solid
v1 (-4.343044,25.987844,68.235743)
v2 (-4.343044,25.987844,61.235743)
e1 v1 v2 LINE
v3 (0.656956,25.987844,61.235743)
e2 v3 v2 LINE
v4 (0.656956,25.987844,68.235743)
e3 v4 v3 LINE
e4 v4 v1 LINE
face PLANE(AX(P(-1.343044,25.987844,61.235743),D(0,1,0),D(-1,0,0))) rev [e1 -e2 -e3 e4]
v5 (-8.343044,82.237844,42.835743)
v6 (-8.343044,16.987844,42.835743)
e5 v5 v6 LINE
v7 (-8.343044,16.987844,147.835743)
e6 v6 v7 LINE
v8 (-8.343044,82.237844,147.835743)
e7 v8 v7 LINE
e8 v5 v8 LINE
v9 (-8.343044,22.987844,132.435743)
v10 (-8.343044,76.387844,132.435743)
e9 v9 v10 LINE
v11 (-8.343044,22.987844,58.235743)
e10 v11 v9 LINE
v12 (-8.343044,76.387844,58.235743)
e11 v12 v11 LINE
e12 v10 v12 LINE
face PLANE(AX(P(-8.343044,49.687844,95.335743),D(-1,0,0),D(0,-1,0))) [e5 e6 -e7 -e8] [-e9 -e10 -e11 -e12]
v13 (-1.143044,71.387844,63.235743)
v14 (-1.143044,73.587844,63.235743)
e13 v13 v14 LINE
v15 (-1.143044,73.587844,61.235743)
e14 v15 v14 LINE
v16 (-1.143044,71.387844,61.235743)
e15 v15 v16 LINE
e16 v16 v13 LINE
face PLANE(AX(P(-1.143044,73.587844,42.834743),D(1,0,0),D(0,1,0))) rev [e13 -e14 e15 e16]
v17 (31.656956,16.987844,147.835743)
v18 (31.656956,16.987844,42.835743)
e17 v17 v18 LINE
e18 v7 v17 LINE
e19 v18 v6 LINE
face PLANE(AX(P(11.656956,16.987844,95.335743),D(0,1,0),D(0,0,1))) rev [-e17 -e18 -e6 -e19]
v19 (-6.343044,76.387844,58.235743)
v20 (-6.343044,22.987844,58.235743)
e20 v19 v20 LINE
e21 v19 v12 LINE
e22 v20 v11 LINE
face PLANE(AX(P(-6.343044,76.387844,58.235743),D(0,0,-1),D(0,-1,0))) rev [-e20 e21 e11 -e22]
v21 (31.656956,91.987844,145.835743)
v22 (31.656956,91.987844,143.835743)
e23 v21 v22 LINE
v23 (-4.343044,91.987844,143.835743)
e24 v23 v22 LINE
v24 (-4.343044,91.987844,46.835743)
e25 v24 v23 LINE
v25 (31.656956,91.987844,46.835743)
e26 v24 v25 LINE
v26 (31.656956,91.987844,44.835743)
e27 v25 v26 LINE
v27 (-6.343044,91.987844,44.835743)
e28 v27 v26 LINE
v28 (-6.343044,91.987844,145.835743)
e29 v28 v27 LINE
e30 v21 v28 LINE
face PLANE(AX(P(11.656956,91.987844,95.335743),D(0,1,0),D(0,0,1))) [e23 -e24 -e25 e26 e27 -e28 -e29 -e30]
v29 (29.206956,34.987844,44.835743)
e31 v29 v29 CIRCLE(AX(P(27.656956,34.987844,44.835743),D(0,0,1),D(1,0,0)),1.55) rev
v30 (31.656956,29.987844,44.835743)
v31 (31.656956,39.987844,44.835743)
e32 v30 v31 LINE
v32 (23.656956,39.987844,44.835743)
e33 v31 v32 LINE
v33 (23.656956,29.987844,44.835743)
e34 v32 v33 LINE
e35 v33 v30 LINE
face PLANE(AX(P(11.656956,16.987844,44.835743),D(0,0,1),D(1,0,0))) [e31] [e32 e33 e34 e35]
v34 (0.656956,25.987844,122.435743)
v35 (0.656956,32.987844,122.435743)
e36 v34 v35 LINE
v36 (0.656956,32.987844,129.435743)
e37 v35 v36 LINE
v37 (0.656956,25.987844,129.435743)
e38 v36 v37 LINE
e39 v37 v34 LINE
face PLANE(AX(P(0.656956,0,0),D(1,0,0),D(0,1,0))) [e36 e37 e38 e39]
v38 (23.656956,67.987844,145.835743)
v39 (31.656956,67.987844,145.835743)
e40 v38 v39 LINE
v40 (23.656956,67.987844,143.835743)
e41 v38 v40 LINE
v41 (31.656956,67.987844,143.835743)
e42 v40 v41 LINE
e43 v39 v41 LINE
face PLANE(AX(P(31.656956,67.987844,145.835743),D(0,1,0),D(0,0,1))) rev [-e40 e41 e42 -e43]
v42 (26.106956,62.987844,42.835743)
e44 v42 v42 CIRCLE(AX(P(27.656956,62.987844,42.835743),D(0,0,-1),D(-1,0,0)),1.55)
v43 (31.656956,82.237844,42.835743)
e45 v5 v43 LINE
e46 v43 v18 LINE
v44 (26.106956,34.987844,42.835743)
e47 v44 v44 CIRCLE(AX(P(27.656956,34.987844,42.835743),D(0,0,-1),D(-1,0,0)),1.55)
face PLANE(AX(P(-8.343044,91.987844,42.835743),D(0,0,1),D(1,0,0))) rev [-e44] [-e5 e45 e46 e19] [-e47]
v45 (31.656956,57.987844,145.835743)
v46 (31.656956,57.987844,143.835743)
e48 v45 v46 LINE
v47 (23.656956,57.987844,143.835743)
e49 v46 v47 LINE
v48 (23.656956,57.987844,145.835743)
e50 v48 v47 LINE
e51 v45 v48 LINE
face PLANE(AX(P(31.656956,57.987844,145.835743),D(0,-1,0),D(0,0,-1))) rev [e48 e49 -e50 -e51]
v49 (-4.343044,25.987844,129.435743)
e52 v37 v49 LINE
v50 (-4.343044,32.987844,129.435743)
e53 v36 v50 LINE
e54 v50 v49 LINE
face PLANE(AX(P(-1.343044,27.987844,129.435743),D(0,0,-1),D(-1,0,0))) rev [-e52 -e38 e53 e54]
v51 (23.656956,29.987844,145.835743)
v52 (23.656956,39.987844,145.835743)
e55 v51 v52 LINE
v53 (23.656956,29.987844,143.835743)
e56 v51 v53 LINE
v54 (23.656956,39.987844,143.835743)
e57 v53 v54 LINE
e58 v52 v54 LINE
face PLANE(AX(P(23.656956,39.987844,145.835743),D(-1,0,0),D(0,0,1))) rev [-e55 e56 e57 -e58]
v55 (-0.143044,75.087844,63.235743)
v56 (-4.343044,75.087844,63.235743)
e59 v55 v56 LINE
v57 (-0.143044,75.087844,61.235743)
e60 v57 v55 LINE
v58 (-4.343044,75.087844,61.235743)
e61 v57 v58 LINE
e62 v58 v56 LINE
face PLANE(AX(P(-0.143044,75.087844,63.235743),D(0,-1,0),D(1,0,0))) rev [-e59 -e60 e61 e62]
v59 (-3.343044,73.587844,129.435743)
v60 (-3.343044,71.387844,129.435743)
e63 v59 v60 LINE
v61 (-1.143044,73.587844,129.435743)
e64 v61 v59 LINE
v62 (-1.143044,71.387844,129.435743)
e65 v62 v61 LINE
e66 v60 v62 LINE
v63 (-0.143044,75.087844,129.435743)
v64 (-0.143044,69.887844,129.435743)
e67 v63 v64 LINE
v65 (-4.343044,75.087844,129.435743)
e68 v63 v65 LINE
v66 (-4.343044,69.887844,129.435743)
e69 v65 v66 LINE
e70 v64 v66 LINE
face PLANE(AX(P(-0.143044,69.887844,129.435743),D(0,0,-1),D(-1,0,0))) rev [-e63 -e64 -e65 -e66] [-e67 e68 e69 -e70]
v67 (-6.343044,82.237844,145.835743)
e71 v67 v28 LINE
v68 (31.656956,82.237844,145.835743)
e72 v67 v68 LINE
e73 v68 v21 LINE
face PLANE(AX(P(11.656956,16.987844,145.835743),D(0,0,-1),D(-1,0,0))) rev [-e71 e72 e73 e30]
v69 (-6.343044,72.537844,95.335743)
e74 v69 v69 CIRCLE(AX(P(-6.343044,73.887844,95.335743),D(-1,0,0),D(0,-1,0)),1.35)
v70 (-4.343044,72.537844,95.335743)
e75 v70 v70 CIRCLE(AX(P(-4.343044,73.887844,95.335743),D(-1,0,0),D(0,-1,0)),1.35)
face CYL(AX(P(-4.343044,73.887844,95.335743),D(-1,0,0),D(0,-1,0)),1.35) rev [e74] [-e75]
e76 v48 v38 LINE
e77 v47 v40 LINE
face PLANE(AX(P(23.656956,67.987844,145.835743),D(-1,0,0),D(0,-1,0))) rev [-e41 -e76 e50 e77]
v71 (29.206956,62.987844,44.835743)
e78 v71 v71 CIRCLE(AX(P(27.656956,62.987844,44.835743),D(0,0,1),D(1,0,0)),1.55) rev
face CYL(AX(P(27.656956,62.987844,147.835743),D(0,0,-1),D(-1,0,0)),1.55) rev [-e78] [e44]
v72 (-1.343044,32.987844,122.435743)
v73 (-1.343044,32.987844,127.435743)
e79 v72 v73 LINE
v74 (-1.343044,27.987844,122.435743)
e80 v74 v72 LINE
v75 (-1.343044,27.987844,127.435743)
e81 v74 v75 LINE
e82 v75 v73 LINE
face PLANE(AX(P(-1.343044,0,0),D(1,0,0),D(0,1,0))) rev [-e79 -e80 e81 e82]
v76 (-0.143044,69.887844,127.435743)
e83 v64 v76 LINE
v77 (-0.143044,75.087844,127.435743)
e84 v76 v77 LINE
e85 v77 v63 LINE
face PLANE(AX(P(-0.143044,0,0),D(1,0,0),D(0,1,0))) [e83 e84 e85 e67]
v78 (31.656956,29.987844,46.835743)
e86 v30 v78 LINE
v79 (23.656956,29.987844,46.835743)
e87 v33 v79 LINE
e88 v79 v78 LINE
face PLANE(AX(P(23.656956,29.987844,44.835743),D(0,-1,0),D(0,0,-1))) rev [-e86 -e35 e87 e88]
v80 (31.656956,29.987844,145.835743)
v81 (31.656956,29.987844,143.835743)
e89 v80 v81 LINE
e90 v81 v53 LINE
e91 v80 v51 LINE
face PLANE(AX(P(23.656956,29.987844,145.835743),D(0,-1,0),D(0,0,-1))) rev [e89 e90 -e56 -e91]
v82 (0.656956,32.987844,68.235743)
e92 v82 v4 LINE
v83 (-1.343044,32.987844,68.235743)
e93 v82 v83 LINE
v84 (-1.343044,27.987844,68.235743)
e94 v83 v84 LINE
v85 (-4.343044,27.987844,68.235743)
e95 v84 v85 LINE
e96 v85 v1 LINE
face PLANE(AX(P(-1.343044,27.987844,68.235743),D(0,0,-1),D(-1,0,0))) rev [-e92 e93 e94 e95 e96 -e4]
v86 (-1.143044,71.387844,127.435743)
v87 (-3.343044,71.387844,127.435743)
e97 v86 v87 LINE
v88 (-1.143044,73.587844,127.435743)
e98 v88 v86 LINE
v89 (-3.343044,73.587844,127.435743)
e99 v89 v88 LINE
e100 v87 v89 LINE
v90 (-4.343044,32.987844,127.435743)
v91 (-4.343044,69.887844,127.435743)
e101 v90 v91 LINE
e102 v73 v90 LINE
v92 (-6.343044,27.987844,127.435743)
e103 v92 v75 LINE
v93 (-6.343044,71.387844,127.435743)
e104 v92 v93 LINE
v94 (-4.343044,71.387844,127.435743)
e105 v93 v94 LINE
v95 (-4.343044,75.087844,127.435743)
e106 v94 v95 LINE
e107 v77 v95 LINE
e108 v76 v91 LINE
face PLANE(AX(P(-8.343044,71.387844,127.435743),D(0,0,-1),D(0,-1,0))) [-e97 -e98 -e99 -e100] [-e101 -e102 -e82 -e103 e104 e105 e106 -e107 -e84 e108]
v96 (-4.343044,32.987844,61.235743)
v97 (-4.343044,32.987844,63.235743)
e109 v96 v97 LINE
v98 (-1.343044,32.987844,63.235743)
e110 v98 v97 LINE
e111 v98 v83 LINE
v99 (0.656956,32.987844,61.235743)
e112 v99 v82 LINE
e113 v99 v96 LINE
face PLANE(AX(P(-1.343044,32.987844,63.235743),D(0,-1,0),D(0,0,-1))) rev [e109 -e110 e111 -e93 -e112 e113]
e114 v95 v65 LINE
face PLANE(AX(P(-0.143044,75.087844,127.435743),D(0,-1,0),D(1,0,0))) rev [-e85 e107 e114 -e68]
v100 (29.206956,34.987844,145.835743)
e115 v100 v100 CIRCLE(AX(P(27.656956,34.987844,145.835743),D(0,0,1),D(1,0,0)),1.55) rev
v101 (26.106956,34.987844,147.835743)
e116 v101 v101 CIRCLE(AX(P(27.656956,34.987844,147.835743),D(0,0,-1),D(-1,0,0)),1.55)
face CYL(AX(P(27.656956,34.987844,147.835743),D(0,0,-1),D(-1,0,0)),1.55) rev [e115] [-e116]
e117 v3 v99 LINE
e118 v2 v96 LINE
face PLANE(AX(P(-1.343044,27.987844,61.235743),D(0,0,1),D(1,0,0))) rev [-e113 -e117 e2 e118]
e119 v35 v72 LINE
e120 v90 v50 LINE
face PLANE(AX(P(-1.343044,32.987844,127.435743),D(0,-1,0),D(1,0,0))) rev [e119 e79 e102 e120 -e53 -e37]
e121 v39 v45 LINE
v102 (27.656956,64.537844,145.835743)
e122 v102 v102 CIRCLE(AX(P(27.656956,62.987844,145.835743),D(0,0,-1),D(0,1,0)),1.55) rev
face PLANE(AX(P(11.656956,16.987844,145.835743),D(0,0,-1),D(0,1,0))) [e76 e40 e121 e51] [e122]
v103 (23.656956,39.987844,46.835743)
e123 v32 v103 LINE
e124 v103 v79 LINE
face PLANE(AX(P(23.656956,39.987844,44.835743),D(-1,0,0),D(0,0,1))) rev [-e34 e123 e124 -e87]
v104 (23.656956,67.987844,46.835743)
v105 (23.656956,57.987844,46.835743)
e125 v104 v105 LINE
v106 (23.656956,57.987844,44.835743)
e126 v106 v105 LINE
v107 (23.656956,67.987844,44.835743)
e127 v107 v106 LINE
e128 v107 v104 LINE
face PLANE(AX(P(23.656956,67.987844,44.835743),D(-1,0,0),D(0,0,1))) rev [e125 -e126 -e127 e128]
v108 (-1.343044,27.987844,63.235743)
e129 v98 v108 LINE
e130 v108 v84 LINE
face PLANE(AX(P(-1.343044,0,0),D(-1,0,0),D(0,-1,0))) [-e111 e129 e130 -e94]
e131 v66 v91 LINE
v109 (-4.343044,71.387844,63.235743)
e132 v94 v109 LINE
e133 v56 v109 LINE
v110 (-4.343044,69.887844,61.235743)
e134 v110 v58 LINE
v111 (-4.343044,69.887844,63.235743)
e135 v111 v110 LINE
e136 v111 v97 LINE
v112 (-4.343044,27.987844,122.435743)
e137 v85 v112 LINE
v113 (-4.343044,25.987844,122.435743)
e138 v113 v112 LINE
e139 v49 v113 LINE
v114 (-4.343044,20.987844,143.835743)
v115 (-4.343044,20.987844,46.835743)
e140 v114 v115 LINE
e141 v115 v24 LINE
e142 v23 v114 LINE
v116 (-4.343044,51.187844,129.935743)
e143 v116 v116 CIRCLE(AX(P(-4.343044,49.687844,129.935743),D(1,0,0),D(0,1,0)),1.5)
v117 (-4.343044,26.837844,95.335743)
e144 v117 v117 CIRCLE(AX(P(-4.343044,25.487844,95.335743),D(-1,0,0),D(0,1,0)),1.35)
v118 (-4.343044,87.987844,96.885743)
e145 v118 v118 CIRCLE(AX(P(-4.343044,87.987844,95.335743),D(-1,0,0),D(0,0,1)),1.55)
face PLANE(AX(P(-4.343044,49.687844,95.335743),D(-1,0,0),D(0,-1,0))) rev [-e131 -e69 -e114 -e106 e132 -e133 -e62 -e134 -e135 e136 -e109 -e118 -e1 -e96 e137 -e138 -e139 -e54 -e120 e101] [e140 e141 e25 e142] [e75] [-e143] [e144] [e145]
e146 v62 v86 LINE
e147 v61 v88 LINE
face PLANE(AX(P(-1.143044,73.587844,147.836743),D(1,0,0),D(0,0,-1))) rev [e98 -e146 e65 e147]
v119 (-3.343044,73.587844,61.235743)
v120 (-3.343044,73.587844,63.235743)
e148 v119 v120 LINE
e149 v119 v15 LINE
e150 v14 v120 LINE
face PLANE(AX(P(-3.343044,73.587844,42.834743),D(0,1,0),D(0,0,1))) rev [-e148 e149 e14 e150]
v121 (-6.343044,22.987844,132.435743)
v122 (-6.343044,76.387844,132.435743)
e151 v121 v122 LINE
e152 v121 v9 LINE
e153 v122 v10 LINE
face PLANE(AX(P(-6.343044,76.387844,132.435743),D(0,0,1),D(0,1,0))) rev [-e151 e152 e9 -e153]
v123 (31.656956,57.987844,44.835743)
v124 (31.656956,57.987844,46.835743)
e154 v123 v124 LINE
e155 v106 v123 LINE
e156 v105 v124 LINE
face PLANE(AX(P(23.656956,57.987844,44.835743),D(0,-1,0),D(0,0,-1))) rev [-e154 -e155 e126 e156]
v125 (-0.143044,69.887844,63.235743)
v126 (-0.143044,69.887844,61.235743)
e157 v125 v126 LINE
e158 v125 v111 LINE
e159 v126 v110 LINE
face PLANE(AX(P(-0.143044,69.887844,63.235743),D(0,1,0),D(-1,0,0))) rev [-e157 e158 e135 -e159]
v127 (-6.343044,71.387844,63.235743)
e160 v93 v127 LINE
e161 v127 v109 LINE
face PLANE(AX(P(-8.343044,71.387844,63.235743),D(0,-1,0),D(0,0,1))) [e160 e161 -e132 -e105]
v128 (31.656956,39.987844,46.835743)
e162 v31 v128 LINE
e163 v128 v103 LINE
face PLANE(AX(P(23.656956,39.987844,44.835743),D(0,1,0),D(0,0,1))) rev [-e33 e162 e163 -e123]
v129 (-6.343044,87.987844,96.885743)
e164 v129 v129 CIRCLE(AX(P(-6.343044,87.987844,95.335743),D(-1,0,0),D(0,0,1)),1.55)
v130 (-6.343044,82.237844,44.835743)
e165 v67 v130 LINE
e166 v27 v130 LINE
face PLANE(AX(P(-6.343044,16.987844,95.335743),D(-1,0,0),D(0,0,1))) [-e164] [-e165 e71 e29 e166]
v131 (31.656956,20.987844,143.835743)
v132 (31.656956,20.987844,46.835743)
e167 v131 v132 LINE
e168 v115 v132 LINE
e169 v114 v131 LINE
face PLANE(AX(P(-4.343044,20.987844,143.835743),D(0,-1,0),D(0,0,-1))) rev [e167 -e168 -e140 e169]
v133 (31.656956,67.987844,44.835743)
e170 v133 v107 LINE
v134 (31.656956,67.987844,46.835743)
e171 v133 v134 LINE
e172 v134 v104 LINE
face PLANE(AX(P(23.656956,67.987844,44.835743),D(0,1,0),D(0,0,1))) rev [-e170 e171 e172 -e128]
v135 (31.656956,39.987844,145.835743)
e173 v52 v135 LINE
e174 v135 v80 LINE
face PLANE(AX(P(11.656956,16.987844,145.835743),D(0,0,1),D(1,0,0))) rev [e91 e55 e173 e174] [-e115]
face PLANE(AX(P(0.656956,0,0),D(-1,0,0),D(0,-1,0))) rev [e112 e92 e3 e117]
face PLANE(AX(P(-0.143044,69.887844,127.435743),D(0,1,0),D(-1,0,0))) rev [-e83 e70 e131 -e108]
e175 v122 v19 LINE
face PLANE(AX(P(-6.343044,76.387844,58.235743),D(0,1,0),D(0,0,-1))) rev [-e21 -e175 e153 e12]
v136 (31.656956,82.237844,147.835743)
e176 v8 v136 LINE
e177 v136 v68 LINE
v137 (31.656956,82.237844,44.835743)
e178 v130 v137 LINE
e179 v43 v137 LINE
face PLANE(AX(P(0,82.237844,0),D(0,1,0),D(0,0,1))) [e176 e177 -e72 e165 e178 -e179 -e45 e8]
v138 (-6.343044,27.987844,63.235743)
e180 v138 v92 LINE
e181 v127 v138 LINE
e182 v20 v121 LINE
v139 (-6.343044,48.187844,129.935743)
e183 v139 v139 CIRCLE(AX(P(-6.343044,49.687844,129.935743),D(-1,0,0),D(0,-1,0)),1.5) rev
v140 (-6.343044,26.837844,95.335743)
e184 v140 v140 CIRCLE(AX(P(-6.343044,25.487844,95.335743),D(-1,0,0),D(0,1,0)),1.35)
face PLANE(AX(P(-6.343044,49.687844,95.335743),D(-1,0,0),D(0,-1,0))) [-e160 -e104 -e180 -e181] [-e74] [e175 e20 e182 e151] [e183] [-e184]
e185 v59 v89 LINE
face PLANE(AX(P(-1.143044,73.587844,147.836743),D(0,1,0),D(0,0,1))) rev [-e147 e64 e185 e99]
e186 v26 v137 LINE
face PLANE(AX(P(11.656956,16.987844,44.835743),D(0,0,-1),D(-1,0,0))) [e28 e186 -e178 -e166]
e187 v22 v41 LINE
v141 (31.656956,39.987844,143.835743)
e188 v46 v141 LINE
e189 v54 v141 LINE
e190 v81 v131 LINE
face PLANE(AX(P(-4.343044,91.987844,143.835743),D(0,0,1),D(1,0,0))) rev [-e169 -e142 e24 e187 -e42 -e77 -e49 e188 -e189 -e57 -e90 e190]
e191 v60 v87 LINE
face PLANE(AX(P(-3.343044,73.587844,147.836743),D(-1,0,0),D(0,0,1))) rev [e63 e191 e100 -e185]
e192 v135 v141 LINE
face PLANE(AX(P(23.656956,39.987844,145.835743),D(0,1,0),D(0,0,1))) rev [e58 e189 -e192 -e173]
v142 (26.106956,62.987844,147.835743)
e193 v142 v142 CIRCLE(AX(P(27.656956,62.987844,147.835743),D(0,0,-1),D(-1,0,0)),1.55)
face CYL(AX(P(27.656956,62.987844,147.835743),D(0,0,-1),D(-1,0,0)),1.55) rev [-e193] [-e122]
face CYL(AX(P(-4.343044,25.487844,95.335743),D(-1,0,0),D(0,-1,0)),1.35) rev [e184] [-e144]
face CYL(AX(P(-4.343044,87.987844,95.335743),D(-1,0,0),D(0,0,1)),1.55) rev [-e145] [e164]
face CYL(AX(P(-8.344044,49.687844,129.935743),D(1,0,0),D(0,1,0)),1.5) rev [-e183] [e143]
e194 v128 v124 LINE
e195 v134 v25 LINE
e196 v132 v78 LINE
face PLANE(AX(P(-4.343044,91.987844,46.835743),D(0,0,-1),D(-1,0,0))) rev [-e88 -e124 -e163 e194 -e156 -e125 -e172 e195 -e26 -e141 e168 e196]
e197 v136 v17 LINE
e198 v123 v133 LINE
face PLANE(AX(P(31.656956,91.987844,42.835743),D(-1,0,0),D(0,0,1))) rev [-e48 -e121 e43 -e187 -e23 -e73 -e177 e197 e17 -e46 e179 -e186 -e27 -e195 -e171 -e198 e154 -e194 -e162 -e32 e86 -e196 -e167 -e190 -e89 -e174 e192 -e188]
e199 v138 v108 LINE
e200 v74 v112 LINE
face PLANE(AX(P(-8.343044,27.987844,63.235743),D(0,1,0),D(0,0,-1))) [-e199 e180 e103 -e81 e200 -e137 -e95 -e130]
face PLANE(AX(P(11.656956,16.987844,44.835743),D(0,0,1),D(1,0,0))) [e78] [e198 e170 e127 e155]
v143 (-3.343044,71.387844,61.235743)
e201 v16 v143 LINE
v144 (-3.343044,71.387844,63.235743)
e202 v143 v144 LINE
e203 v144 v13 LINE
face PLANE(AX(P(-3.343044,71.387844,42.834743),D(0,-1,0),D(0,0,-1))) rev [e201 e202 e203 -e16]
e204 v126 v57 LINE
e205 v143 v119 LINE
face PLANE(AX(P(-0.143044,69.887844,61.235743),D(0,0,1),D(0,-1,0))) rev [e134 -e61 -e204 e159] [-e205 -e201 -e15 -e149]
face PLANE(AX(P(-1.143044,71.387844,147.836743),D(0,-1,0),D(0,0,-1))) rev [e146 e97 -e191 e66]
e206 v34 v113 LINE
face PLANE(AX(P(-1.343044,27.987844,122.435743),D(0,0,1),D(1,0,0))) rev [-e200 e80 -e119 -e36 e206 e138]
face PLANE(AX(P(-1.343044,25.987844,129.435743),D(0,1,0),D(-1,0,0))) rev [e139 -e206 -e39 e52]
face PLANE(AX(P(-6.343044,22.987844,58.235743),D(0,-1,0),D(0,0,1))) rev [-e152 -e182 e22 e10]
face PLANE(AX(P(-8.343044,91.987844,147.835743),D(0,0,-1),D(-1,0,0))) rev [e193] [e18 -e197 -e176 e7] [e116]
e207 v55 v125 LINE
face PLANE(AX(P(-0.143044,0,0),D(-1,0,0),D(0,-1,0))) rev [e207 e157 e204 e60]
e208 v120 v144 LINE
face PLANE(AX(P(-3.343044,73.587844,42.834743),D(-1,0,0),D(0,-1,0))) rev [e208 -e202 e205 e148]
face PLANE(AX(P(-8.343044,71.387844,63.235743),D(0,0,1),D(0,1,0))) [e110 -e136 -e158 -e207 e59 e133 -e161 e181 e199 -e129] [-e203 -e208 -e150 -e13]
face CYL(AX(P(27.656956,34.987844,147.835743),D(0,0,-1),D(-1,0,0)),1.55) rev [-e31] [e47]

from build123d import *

# Parameters (mm, degrees)
COMBINE1_START         = -8.34304364
COMBINE1_DEPTH         = 32
COMBINE1_START_2       = -6.34304364
COMBINE1_2_OUTLINE_R   = 1.35
COMBINE1_2_OUTLINE_W   = 43.4
COMBINE1_2_OUTLINE_H   = 64.2
COMBINE1_2_OUTLINE_R_2 = 1.55
COMBINE1_2_DEPTH       = 2
COMBINE1_3_OUTLINE_W   = 61.2
COMBINE1_3_OUTLINE_H   = 97
COMBINE1_3_OUTLINE_W_2 = 53.4
COMBINE1_3_OUTLINE_H_2 = 74.2
COMBINE1_3_DEPTH       = 2
COMBINE1_START_3       = -4.34304364
COMBINE1_4_DEPTH       = 30.4499999
COMBINE1_START_4       = 29.20695646
COMBINE1_5_DEPTH       = 2.4499999
COMBINE1_START_5       = 23.65695636
COMBINE1_6_OUTLINE_W   = 9.8
COMBINE1_6_OUTLINE_H   = 2
COMBINE1_6_DEPTH       = 8
COMBINE1_START_6       = 42.835743365
COMBINE1_7_OUTLINE_W   = 3.1000002
COMBINE1_7_OUTLINE_H   = 4
COMBINE1_7_DEPTH       = 105
COMBINE1_8_OUTLINE_W   = 3.1000002
COMBINE1_8_OUTLINE_H   = 18
COMBINE1_8_OUTLINE_H_2 = 14.2
COMBINE1_8_OUTLINE_H_3 = 9
COMBINE1_8_DEPTH       = 4
COMBINE1_START_7       = 143.835743365
COMBINE1_9_OUTLINE_W   = 3.1000002
COMBINE1_9_OUTLINE_H   = 18
COMBINE1_9_OUTLINE_H_2 = 14.2
COMBINE1_9_OUTLINE_H_3 = 9
COMBINE1_9_DEPTH       = 4
COMBINE1_10_DEPTH      = 2
COMBINE1_START_8       = 145.835743365
COMBINE1_11_DEPTH      = 2
CUT_EXTRUDE1_REACH     = 179.801
SKETCH2_R              = 1.5
BOSS_EXTRUDE1_DEPTH    = 3
SKETCH4_W              = 7
SKETCH4_H              = 7
BOSS_EXTRUDE2_DEPTH    = 2
SKETCH5_W              = 2
SKETCH5_H              = 5.2
BOSS_EXTRUDE3_DEPTH    = 4.2
CUT_EXTRUDE2_REACH     = 130.923
SKETCH6_W              = 2.2
SKETCH6_H              = 2.2
CUT_EXTRUDE3_REACH     = 130.923
SKETCH7_W              = 2.2
SKETCH7_H              = 2.2
SKETCH8_W              = 2
SKETCH8_H              = 101
BOSS_EXTRUDE4_DEPTH    = 0.05


with BuildPart() as part:
    # Combine1: read off the stored shape, not the designer's step
    # Combine1 outline → Combine1 (new body)
    with BuildSketch(Plane.YZ.offset(COMBINE1_START)):
        Polygon((82.18784428, 42.835743365), (82.18784428, 46.835743365), (20.98784428, 46.835743365), (20.98784428, 143.835743365), (82.18784428, 143.835743365), (82.18784428, 147.835743365), (16.98784428, 147.835743365), (16.98784428, 42.835743365), align=None)
    extrude(amount=COMBINE1_DEPTH)

    # Combine1 2 outline → Combine1 2 (add)
    with BuildSketch(Plane.YZ.offset(COMBINE1_START_2)):
        Polygon((82.18784428, 46.835743365), (82.18784428, 44.835743365), (91.98784428, 44.835743365), (91.98784428, 145.835743365), (82.18784428, 145.835743365), (82.18784428, 143.835743365), (20.98784428, 143.835743365), (20.98784428, 46.835743365), align=None)
        with Locations((25.48784428, 95.335743365)):
            Circle(COMBINE1_2_OUTLINE_R, mode=Mode.SUBTRACT)
        with Locations((49.68784428, 95.335743365)):
            Rectangle(COMBINE1_2_OUTLINE_W, COMBINE1_2_OUTLINE_H, mode=Mode.SUBTRACT)
        with Locations((73.88784428, 95.335743365)):
            Circle(COMBINE1_2_OUTLINE_R, mode=Mode.SUBTRACT)
        with Locations((87.98784428, 95.335743365)):
            Circle(COMBINE1_2_OUTLINE_R_2, mode=Mode.SUBTRACT)
    extrude(amount=COMBINE1_2_DEPTH)

    # Combine1 3 outline → Combine1 3 (add)
    with BuildSketch(Plane.YZ.offset(COMBINE1_START)):
        with Locations((51.58784428, 95.335743365)):
            Rectangle(COMBINE1_3_OUTLINE_W, COMBINE1_3_OUTLINE_H)
        with Locations((49.68784428, 95.335743365)):
            Rectangle(COMBINE1_3_OUTLINE_W_2, COMBINE1_3_OUTLINE_H_2, mode=Mode.SUBTRACT)
    extrude(amount=COMBINE1_3_DEPTH)

    # Combine1 4 outline → Combine1 4 (add)
    with BuildSketch(Plane.YZ.offset(COMBINE1_START_3)):
        Polygon((82.18784428, 44.835743365), (91.98784428, 44.835743365), (91.98784428, 46.835743365), (67.98784428, 46.835743365), (67.98784428, 44.835743365), (57.98784428, 44.835743365), (57.98784428, 46.835743365), (39.98784428, 46.835743365), (39.98784428, 44.835743365), (29.98784428, 44.835743365), (29.98784428, 46.835743365), (20.98784428, 46.835743365), (20.98784428, 143.835743365), (29.98784428, 143.835743365), (29.98784428, 145.835743365), (39.98784428, 145.835743365), (39.98784428, 143.835743365), (57.98784428, 143.835743365), (57.98784428, 145.835743365), (67.98784428, 145.835743365), (67.98784428, 143.835743365), (91.98784428, 143.835743365), (91.98784428, 145.835743365), (82.18784428, 145.835743365), (82.18784428, 147.835743365), (16.98784428, 147.835743365), (16.98784428, 42.835743365), (82.18784428, 42.835743365), align=None)
    extrude(amount=COMBINE1_4_DEPTH)



with BuildPart() as body_2:
    # Combine1 5 outline → Combine1 5 (new body)
    with BuildSketch(Plane.YZ.offset(COMBINE1_START_4)):
        Polygon((82.18784428, 44.835743365), (91.98784428, 44.835743365), (91.98784428, 46.835743365), (67.98784428, 46.835743365), (67.98784428, 44.835743365), (57.98784428, 44.835743365), (57.98784428, 46.835743365), (39.98784428, 46.835743365), (39.98784428, 44.835743365), (29.98784428, 44.835743365), (29.98784428, 46.835743365), (20.98784428, 46.835743365), (20.98784428, 143.835743365), (29.98784428, 143.835743365), (29.98784428, 145.835743365), (39.98784428, 145.835743365), (39.98784428, 143.835743365), (57.98784428, 143.835743365), (57.98784428, 145.835743365), (67.98784428, 145.835743365), (67.98784428, 143.835743365), (91.98784428, 143.835743365), (91.98784428, 145.835743365), (82.18784428, 145.835743365), (82.18784428, 147.835743365), (16.98784428, 147.835743365), (16.98784428, 42.835743365), (82.18784428, 42.835743365), align=None)
    extrude(amount=COMBINE1_5_DEPTH)


with BuildPart() as part_1:
    add(part.part)

    add(body_2.part)  # Combine1 6 merges body 2
    # Combine1 6 outline → Combine1 6 (add)
    with BuildSketch(Plane.YZ.offset(COMBINE1_START_5)):
        with Locations((87.08784428, 45.835743365)):
            Rectangle(COMBINE1_6_OUTLINE_W, COMBINE1_6_OUTLINE_H)
        with Locations((87.08784428, 144.835743365)):
            Rectangle(COMBINE1_6_OUTLINE_W, COMBINE1_6_OUTLINE_H)
    extrude(amount=COMBINE1_6_DEPTH)

    # Combine1 7 outline → Combine1 7 (add)
    with BuildSketch(Plane.XY.offset(COMBINE1_START_6)):
        with Locations((27.65695636, 18.98784428)):
            Rectangle(COMBINE1_7_OUTLINE_W, COMBINE1_7_OUTLINE_H)
    extrude(amount=COMBINE1_7_DEPTH)

    # Combine1 8 outline → Combine1 8 (add)
    with BuildSketch(Plane.XY.offset(COMBINE1_START_6)):
        with Locations((27.65695636, 48.98784428)):
            Rectangle(COMBINE1_8_OUTLINE_W, COMBINE1_8_OUTLINE_H)
        with Locations((27.65695636, 75.08784428)):
            Rectangle(COMBINE1_8_OUTLINE_W, COMBINE1_8_OUTLINE_H_2)
        with Locations((27.65695636, 25.48784428)):
            Rectangle(COMBINE1_8_OUTLINE_W, COMBINE1_8_OUTLINE_H_3)
    extrude(amount=COMBINE1_8_DEPTH)

    # Combine1 9 outline → Combine1 9 (add)
    with BuildSketch(Plane.XY.offset(COMBINE1_START_7)):
        with Locations((27.65695636, 48.98784428)):
            Rectangle(COMBINE1_9_OUTLINE_W, COMBINE1_9_OUTLINE_H)
        with Locations((27.65695636, 75.08784428)):
            Rectangle(COMBINE1_9_OUTLINE_W, COMBINE1_9_OUTLINE_H_2)
        with Locations((27.65695636, 25.48784428)):
            Rectangle(COMBINE1_9_OUTLINE_W, COMBINE1_9_OUTLINE_H_3)
    extrude(amount=COMBINE1_9_DEPTH)

    # Combine1 10 outline → Combine1 10 (add)
    with BuildSketch(Plane.XY.offset(COMBINE1_START_6)):
        with BuildLine():
            Line((29.20695646, 57.98784428), (29.20695636, 62.98784428))
            ThreePointArc((29.20695636, 62.98784428), (27.656956333, 61.43784428), (26.10695636, 62.987844335))
            Line((26.10695636, 62.987844335), (26.10695626, 57.98784428))
            Line((26.10695626, 57.98784428), (29.20695646, 57.98784428))
        make_face()
        with BuildLine():
            ThreePointArc((26.10695636, 62.987844335), (27.656956387, 64.53784428), (29.20695636, 62.98784428))
            Line((29.20695636, 62.98784428), (29.20695646, 67.98784428))
            Line((29.20695646, 67.98784428), (26.10695626, 67.98784428))
            Line((26.10695626, 67.98784428), (26.10695636, 62.987844335))
        make_face()
        with BuildLine():
            Line((29.20695636, 34.98784428), (29.20695646, 39.98784428))
            Line((29.20695646, 39.98784428), (26.10695626, 39.98784428))
            Line((26.10695626, 39.98784428), (26.10695636, 34.98784428))
            ThreePointArc((26.10695636, 34.98784428), (27.65695636, 36.53784428), (29.20695636, 34.98784428))
        make_face()
        with BuildLine():
            Line((29.20695646, 29.98784428), (29.20695636, 34.98784428))
            ThreePointArc((29.20695636, 34.98784428), (27.65695636, 33.43784428), (26.10695636, 34.98784428))
            Line((26.10695636, 34.98784428), (26.10695626, 29.98784428))
            Line((26.10695626, 29.98784428), (29.20695646, 29.98784428))
        make_face()
    extrude(amount=COMBINE1_10_DEPTH)

    # Combine1 11 outline → Combine1 11 (add)
    with BuildSketch(Plane.XY.offset(COMBINE1_START_8)):
        with BuildLine():
            Line((29.20695646, 57.98784428), (29.20695636, 62.98784428))
            ThreePointArc((29.20695636, 62.98784428), (27.656956333, 61.43784428), (26.10695636, 62.987844335))
            Line((26.10695636, 62.987844335), (26.10695626, 57.98784428))
            Line((26.10695626, 57.98784428), (29.20695646, 57.98784428))
        make_face()
        with BuildLine():
            ThreePointArc((26.10695636, 62.987844335), (27.656956387, 64.53784428), (29.20695636, 62.98784428))
            Line((29.20695636, 62.98784428), (29.20695646, 67.98784428))
            Line((29.20695646, 67.98784428), (26.10695626, 67.98784428))
            Line((26.10695626, 67.98784428), (26.10695636, 62.987844335))
        make_face()
        with BuildLine():
            Line((29.20695636, 34.98784428), (29.20695646, 39.98784428))
            Line((29.20695646, 39.98784428), (26.10695626, 39.98784428))
            Line((26.10695626, 39.98784428), (26.10695636, 34.98784428))
            ThreePointArc((26.10695636, 34.98784428), (27.65695636, 36.53784428), (29.20695636, 34.98784428))
        make_face()
        with BuildLine():
            Line((29.20695646, 29.98784428), (29.20695636, 34.98784428))
            ThreePointArc((29.20695636, 34.98784428), (27.65695636, 33.43784428), (26.10695636, 34.98784428))
            Line((26.10695636, 34.98784428), (26.10695626, 29.98784428))
            Line((26.10695626, 29.98784428), (29.20695646, 29.98784428))
        make_face()
    extrude(amount=COMBINE1_11_DEPTH)

    # Sketch2 → Cut-Extrude1 (cut, up to next)
    with BuildSketch(Plane(origin=(-4.34304364, 0, 0), x_dir=(0, 0, -1), z_dir=(1, 0, 0)), mode=Mode.PRIVATE) as cut_extrude1_sk1:
        with Locations(Location((-129.935743365, 49.68784428, 0), (0, 0, 90))):
            Circle(SKETCH2_R)
    cut_extrude1_tool1 = extrude(cut_extrude1_sk1.sketch, amount=-CUT_EXTRUDE1_REACH, mode=Mode.PRIVATE) & part_1.part
    add(cut_extrude1_tool1.solids().sort_by_distance((-4.343044, 49.687844, 129.935743))[0], mode=Mode.SUBTRACT)

    # Sketch3 → Boss-Extrude1 (add)
    with BuildSketch(Plane(origin=(-4.34304364, 0, 0), x_dir=(0, 0, -1), z_dir=(1, 0, 0))):
        Polygon((-127.435743365, 27.98784428), (-127.435743365, 32.98784428), (-129.435743365, 32.98784428), (-129.435743365, 27.98784428), (-129.435743365, 25.98784428), (-122.435743365, 25.98784428), (-122.435743365, 27.98784428), align=None)
        Polygon((-63.235743365, 27.98784428), (-68.235743365, 27.98784428), (-68.235743365, 25.98784428), (-61.235743365, 25.98784428), (-61.235743365, 27.98784428), (-61.235743365, 32.98784428), (-63.235743365, 32.98784428), align=None)
    extrude(amount=BOSS_EXTRUDE1_DEPTH)

    # Sketch4 → Boss-Extrude2 (add)
    with BuildSketch(Plane(origin=(-1.34304364, 0, 0), x_dir=(0, 0, -1), z_dir=(1, 0, 0))):
        with Locations((-125.935743365, 29.48784428)):
            Rectangle(SKETCH4_W, SKETCH4_H)
        with Locations((-64.735743365, 29.48784428)):
            Rectangle(SKETCH4_W, SKETCH4_H)
    extrude(amount=BOSS_EXTRUDE2_DEPTH)

    # Sketch5 → Boss-Extrude3 (add)
    with BuildSketch(Plane(origin=(-4.34304364, 0, 0), x_dir=(0, 0, -1), z_dir=(1, 0, 0))):
        with Locations((-128.435743365, 72.48784428)):
            Rectangle(SKETCH5_W, SKETCH5_H)
        with Locations((-62.235743365, 72.48784428)):
            Rectangle(SKETCH5_W, SKETCH5_H)
    extrude(amount=BOSS_EXTRUDE3_DEPTH)

    # Sketch6 → Cut-Extrude2 (cut, up to next)
    with BuildSketch(Plane.XY.offset(63.235743365), mode=Mode.PRIVATE) as cut_extrude2_sk1:
        with Locations((-2.24304364, 72.48784428)):
            Rectangle(SKETCH6_W, SKETCH6_H)
    cut_extrude2_tool1 = extrude(cut_extrude2_sk1.sketch, amount=-CUT_EXTRUDE2_REACH, mode=Mode.PRIVATE) & part_1.part
    add(cut_extrude2_tool1.solids().sort_by_distance((-2.243044, 72.487844, 63.235743))[0], mode=Mode.SUBTRACT)

    # Sketch7 → Cut-Extrude3 (cut, up to next)
    with BuildSketch(Plane(origin=(0, 0, 127.435743365), x_dir=(-1, 0, 0), z_dir=(0, 0, -1)), mode=Mode.PRIVATE) as cut_extrude3_sk1:
        with Locations((2.24304364, 72.48784428)):
            Rectangle(SKETCH7_W, SKETCH7_H)
    cut_extrude3_tool1 = extrude(cut_extrude3_sk1.sketch, amount=-CUT_EXTRUDE3_REACH, mode=Mode.PRIVATE) & part_1.part
    add(cut_extrude3_tool1.solids().sort_by_distance((-2.243044, 72.487844, 127.435743))[0], mode=Mode.SUBTRACT)

    # Sketch8 → Boss-Extrude4 (add)
    with BuildSketch(Plane(origin=(0, 82.18784428, 0), x_dir=(1, 0, 0), z_dir=(0, 1, 0))):
        Polygon((31.65695636, -42.835743365), (-8.34304364, -42.835743365), (-8.34304364, -44.835743365), (-6.34304364, -44.835743365), (31.65695636, -44.835743365), align=None)
        with Locations((-7.34304364, -95.335743365)):
            Rectangle(SKETCH8_W, SKETCH8_H)
        Polygon((-6.34304364, -145.835743365), (-8.34304364, -145.835743365), (-8.34304364, -147.835743365), (31.65695636, -147.835743365), (31.65695636, -145.835743365), align=None)
    extrude(amount=BOSS_EXTRUDE4_DEPTH)


solid = part_1.part
